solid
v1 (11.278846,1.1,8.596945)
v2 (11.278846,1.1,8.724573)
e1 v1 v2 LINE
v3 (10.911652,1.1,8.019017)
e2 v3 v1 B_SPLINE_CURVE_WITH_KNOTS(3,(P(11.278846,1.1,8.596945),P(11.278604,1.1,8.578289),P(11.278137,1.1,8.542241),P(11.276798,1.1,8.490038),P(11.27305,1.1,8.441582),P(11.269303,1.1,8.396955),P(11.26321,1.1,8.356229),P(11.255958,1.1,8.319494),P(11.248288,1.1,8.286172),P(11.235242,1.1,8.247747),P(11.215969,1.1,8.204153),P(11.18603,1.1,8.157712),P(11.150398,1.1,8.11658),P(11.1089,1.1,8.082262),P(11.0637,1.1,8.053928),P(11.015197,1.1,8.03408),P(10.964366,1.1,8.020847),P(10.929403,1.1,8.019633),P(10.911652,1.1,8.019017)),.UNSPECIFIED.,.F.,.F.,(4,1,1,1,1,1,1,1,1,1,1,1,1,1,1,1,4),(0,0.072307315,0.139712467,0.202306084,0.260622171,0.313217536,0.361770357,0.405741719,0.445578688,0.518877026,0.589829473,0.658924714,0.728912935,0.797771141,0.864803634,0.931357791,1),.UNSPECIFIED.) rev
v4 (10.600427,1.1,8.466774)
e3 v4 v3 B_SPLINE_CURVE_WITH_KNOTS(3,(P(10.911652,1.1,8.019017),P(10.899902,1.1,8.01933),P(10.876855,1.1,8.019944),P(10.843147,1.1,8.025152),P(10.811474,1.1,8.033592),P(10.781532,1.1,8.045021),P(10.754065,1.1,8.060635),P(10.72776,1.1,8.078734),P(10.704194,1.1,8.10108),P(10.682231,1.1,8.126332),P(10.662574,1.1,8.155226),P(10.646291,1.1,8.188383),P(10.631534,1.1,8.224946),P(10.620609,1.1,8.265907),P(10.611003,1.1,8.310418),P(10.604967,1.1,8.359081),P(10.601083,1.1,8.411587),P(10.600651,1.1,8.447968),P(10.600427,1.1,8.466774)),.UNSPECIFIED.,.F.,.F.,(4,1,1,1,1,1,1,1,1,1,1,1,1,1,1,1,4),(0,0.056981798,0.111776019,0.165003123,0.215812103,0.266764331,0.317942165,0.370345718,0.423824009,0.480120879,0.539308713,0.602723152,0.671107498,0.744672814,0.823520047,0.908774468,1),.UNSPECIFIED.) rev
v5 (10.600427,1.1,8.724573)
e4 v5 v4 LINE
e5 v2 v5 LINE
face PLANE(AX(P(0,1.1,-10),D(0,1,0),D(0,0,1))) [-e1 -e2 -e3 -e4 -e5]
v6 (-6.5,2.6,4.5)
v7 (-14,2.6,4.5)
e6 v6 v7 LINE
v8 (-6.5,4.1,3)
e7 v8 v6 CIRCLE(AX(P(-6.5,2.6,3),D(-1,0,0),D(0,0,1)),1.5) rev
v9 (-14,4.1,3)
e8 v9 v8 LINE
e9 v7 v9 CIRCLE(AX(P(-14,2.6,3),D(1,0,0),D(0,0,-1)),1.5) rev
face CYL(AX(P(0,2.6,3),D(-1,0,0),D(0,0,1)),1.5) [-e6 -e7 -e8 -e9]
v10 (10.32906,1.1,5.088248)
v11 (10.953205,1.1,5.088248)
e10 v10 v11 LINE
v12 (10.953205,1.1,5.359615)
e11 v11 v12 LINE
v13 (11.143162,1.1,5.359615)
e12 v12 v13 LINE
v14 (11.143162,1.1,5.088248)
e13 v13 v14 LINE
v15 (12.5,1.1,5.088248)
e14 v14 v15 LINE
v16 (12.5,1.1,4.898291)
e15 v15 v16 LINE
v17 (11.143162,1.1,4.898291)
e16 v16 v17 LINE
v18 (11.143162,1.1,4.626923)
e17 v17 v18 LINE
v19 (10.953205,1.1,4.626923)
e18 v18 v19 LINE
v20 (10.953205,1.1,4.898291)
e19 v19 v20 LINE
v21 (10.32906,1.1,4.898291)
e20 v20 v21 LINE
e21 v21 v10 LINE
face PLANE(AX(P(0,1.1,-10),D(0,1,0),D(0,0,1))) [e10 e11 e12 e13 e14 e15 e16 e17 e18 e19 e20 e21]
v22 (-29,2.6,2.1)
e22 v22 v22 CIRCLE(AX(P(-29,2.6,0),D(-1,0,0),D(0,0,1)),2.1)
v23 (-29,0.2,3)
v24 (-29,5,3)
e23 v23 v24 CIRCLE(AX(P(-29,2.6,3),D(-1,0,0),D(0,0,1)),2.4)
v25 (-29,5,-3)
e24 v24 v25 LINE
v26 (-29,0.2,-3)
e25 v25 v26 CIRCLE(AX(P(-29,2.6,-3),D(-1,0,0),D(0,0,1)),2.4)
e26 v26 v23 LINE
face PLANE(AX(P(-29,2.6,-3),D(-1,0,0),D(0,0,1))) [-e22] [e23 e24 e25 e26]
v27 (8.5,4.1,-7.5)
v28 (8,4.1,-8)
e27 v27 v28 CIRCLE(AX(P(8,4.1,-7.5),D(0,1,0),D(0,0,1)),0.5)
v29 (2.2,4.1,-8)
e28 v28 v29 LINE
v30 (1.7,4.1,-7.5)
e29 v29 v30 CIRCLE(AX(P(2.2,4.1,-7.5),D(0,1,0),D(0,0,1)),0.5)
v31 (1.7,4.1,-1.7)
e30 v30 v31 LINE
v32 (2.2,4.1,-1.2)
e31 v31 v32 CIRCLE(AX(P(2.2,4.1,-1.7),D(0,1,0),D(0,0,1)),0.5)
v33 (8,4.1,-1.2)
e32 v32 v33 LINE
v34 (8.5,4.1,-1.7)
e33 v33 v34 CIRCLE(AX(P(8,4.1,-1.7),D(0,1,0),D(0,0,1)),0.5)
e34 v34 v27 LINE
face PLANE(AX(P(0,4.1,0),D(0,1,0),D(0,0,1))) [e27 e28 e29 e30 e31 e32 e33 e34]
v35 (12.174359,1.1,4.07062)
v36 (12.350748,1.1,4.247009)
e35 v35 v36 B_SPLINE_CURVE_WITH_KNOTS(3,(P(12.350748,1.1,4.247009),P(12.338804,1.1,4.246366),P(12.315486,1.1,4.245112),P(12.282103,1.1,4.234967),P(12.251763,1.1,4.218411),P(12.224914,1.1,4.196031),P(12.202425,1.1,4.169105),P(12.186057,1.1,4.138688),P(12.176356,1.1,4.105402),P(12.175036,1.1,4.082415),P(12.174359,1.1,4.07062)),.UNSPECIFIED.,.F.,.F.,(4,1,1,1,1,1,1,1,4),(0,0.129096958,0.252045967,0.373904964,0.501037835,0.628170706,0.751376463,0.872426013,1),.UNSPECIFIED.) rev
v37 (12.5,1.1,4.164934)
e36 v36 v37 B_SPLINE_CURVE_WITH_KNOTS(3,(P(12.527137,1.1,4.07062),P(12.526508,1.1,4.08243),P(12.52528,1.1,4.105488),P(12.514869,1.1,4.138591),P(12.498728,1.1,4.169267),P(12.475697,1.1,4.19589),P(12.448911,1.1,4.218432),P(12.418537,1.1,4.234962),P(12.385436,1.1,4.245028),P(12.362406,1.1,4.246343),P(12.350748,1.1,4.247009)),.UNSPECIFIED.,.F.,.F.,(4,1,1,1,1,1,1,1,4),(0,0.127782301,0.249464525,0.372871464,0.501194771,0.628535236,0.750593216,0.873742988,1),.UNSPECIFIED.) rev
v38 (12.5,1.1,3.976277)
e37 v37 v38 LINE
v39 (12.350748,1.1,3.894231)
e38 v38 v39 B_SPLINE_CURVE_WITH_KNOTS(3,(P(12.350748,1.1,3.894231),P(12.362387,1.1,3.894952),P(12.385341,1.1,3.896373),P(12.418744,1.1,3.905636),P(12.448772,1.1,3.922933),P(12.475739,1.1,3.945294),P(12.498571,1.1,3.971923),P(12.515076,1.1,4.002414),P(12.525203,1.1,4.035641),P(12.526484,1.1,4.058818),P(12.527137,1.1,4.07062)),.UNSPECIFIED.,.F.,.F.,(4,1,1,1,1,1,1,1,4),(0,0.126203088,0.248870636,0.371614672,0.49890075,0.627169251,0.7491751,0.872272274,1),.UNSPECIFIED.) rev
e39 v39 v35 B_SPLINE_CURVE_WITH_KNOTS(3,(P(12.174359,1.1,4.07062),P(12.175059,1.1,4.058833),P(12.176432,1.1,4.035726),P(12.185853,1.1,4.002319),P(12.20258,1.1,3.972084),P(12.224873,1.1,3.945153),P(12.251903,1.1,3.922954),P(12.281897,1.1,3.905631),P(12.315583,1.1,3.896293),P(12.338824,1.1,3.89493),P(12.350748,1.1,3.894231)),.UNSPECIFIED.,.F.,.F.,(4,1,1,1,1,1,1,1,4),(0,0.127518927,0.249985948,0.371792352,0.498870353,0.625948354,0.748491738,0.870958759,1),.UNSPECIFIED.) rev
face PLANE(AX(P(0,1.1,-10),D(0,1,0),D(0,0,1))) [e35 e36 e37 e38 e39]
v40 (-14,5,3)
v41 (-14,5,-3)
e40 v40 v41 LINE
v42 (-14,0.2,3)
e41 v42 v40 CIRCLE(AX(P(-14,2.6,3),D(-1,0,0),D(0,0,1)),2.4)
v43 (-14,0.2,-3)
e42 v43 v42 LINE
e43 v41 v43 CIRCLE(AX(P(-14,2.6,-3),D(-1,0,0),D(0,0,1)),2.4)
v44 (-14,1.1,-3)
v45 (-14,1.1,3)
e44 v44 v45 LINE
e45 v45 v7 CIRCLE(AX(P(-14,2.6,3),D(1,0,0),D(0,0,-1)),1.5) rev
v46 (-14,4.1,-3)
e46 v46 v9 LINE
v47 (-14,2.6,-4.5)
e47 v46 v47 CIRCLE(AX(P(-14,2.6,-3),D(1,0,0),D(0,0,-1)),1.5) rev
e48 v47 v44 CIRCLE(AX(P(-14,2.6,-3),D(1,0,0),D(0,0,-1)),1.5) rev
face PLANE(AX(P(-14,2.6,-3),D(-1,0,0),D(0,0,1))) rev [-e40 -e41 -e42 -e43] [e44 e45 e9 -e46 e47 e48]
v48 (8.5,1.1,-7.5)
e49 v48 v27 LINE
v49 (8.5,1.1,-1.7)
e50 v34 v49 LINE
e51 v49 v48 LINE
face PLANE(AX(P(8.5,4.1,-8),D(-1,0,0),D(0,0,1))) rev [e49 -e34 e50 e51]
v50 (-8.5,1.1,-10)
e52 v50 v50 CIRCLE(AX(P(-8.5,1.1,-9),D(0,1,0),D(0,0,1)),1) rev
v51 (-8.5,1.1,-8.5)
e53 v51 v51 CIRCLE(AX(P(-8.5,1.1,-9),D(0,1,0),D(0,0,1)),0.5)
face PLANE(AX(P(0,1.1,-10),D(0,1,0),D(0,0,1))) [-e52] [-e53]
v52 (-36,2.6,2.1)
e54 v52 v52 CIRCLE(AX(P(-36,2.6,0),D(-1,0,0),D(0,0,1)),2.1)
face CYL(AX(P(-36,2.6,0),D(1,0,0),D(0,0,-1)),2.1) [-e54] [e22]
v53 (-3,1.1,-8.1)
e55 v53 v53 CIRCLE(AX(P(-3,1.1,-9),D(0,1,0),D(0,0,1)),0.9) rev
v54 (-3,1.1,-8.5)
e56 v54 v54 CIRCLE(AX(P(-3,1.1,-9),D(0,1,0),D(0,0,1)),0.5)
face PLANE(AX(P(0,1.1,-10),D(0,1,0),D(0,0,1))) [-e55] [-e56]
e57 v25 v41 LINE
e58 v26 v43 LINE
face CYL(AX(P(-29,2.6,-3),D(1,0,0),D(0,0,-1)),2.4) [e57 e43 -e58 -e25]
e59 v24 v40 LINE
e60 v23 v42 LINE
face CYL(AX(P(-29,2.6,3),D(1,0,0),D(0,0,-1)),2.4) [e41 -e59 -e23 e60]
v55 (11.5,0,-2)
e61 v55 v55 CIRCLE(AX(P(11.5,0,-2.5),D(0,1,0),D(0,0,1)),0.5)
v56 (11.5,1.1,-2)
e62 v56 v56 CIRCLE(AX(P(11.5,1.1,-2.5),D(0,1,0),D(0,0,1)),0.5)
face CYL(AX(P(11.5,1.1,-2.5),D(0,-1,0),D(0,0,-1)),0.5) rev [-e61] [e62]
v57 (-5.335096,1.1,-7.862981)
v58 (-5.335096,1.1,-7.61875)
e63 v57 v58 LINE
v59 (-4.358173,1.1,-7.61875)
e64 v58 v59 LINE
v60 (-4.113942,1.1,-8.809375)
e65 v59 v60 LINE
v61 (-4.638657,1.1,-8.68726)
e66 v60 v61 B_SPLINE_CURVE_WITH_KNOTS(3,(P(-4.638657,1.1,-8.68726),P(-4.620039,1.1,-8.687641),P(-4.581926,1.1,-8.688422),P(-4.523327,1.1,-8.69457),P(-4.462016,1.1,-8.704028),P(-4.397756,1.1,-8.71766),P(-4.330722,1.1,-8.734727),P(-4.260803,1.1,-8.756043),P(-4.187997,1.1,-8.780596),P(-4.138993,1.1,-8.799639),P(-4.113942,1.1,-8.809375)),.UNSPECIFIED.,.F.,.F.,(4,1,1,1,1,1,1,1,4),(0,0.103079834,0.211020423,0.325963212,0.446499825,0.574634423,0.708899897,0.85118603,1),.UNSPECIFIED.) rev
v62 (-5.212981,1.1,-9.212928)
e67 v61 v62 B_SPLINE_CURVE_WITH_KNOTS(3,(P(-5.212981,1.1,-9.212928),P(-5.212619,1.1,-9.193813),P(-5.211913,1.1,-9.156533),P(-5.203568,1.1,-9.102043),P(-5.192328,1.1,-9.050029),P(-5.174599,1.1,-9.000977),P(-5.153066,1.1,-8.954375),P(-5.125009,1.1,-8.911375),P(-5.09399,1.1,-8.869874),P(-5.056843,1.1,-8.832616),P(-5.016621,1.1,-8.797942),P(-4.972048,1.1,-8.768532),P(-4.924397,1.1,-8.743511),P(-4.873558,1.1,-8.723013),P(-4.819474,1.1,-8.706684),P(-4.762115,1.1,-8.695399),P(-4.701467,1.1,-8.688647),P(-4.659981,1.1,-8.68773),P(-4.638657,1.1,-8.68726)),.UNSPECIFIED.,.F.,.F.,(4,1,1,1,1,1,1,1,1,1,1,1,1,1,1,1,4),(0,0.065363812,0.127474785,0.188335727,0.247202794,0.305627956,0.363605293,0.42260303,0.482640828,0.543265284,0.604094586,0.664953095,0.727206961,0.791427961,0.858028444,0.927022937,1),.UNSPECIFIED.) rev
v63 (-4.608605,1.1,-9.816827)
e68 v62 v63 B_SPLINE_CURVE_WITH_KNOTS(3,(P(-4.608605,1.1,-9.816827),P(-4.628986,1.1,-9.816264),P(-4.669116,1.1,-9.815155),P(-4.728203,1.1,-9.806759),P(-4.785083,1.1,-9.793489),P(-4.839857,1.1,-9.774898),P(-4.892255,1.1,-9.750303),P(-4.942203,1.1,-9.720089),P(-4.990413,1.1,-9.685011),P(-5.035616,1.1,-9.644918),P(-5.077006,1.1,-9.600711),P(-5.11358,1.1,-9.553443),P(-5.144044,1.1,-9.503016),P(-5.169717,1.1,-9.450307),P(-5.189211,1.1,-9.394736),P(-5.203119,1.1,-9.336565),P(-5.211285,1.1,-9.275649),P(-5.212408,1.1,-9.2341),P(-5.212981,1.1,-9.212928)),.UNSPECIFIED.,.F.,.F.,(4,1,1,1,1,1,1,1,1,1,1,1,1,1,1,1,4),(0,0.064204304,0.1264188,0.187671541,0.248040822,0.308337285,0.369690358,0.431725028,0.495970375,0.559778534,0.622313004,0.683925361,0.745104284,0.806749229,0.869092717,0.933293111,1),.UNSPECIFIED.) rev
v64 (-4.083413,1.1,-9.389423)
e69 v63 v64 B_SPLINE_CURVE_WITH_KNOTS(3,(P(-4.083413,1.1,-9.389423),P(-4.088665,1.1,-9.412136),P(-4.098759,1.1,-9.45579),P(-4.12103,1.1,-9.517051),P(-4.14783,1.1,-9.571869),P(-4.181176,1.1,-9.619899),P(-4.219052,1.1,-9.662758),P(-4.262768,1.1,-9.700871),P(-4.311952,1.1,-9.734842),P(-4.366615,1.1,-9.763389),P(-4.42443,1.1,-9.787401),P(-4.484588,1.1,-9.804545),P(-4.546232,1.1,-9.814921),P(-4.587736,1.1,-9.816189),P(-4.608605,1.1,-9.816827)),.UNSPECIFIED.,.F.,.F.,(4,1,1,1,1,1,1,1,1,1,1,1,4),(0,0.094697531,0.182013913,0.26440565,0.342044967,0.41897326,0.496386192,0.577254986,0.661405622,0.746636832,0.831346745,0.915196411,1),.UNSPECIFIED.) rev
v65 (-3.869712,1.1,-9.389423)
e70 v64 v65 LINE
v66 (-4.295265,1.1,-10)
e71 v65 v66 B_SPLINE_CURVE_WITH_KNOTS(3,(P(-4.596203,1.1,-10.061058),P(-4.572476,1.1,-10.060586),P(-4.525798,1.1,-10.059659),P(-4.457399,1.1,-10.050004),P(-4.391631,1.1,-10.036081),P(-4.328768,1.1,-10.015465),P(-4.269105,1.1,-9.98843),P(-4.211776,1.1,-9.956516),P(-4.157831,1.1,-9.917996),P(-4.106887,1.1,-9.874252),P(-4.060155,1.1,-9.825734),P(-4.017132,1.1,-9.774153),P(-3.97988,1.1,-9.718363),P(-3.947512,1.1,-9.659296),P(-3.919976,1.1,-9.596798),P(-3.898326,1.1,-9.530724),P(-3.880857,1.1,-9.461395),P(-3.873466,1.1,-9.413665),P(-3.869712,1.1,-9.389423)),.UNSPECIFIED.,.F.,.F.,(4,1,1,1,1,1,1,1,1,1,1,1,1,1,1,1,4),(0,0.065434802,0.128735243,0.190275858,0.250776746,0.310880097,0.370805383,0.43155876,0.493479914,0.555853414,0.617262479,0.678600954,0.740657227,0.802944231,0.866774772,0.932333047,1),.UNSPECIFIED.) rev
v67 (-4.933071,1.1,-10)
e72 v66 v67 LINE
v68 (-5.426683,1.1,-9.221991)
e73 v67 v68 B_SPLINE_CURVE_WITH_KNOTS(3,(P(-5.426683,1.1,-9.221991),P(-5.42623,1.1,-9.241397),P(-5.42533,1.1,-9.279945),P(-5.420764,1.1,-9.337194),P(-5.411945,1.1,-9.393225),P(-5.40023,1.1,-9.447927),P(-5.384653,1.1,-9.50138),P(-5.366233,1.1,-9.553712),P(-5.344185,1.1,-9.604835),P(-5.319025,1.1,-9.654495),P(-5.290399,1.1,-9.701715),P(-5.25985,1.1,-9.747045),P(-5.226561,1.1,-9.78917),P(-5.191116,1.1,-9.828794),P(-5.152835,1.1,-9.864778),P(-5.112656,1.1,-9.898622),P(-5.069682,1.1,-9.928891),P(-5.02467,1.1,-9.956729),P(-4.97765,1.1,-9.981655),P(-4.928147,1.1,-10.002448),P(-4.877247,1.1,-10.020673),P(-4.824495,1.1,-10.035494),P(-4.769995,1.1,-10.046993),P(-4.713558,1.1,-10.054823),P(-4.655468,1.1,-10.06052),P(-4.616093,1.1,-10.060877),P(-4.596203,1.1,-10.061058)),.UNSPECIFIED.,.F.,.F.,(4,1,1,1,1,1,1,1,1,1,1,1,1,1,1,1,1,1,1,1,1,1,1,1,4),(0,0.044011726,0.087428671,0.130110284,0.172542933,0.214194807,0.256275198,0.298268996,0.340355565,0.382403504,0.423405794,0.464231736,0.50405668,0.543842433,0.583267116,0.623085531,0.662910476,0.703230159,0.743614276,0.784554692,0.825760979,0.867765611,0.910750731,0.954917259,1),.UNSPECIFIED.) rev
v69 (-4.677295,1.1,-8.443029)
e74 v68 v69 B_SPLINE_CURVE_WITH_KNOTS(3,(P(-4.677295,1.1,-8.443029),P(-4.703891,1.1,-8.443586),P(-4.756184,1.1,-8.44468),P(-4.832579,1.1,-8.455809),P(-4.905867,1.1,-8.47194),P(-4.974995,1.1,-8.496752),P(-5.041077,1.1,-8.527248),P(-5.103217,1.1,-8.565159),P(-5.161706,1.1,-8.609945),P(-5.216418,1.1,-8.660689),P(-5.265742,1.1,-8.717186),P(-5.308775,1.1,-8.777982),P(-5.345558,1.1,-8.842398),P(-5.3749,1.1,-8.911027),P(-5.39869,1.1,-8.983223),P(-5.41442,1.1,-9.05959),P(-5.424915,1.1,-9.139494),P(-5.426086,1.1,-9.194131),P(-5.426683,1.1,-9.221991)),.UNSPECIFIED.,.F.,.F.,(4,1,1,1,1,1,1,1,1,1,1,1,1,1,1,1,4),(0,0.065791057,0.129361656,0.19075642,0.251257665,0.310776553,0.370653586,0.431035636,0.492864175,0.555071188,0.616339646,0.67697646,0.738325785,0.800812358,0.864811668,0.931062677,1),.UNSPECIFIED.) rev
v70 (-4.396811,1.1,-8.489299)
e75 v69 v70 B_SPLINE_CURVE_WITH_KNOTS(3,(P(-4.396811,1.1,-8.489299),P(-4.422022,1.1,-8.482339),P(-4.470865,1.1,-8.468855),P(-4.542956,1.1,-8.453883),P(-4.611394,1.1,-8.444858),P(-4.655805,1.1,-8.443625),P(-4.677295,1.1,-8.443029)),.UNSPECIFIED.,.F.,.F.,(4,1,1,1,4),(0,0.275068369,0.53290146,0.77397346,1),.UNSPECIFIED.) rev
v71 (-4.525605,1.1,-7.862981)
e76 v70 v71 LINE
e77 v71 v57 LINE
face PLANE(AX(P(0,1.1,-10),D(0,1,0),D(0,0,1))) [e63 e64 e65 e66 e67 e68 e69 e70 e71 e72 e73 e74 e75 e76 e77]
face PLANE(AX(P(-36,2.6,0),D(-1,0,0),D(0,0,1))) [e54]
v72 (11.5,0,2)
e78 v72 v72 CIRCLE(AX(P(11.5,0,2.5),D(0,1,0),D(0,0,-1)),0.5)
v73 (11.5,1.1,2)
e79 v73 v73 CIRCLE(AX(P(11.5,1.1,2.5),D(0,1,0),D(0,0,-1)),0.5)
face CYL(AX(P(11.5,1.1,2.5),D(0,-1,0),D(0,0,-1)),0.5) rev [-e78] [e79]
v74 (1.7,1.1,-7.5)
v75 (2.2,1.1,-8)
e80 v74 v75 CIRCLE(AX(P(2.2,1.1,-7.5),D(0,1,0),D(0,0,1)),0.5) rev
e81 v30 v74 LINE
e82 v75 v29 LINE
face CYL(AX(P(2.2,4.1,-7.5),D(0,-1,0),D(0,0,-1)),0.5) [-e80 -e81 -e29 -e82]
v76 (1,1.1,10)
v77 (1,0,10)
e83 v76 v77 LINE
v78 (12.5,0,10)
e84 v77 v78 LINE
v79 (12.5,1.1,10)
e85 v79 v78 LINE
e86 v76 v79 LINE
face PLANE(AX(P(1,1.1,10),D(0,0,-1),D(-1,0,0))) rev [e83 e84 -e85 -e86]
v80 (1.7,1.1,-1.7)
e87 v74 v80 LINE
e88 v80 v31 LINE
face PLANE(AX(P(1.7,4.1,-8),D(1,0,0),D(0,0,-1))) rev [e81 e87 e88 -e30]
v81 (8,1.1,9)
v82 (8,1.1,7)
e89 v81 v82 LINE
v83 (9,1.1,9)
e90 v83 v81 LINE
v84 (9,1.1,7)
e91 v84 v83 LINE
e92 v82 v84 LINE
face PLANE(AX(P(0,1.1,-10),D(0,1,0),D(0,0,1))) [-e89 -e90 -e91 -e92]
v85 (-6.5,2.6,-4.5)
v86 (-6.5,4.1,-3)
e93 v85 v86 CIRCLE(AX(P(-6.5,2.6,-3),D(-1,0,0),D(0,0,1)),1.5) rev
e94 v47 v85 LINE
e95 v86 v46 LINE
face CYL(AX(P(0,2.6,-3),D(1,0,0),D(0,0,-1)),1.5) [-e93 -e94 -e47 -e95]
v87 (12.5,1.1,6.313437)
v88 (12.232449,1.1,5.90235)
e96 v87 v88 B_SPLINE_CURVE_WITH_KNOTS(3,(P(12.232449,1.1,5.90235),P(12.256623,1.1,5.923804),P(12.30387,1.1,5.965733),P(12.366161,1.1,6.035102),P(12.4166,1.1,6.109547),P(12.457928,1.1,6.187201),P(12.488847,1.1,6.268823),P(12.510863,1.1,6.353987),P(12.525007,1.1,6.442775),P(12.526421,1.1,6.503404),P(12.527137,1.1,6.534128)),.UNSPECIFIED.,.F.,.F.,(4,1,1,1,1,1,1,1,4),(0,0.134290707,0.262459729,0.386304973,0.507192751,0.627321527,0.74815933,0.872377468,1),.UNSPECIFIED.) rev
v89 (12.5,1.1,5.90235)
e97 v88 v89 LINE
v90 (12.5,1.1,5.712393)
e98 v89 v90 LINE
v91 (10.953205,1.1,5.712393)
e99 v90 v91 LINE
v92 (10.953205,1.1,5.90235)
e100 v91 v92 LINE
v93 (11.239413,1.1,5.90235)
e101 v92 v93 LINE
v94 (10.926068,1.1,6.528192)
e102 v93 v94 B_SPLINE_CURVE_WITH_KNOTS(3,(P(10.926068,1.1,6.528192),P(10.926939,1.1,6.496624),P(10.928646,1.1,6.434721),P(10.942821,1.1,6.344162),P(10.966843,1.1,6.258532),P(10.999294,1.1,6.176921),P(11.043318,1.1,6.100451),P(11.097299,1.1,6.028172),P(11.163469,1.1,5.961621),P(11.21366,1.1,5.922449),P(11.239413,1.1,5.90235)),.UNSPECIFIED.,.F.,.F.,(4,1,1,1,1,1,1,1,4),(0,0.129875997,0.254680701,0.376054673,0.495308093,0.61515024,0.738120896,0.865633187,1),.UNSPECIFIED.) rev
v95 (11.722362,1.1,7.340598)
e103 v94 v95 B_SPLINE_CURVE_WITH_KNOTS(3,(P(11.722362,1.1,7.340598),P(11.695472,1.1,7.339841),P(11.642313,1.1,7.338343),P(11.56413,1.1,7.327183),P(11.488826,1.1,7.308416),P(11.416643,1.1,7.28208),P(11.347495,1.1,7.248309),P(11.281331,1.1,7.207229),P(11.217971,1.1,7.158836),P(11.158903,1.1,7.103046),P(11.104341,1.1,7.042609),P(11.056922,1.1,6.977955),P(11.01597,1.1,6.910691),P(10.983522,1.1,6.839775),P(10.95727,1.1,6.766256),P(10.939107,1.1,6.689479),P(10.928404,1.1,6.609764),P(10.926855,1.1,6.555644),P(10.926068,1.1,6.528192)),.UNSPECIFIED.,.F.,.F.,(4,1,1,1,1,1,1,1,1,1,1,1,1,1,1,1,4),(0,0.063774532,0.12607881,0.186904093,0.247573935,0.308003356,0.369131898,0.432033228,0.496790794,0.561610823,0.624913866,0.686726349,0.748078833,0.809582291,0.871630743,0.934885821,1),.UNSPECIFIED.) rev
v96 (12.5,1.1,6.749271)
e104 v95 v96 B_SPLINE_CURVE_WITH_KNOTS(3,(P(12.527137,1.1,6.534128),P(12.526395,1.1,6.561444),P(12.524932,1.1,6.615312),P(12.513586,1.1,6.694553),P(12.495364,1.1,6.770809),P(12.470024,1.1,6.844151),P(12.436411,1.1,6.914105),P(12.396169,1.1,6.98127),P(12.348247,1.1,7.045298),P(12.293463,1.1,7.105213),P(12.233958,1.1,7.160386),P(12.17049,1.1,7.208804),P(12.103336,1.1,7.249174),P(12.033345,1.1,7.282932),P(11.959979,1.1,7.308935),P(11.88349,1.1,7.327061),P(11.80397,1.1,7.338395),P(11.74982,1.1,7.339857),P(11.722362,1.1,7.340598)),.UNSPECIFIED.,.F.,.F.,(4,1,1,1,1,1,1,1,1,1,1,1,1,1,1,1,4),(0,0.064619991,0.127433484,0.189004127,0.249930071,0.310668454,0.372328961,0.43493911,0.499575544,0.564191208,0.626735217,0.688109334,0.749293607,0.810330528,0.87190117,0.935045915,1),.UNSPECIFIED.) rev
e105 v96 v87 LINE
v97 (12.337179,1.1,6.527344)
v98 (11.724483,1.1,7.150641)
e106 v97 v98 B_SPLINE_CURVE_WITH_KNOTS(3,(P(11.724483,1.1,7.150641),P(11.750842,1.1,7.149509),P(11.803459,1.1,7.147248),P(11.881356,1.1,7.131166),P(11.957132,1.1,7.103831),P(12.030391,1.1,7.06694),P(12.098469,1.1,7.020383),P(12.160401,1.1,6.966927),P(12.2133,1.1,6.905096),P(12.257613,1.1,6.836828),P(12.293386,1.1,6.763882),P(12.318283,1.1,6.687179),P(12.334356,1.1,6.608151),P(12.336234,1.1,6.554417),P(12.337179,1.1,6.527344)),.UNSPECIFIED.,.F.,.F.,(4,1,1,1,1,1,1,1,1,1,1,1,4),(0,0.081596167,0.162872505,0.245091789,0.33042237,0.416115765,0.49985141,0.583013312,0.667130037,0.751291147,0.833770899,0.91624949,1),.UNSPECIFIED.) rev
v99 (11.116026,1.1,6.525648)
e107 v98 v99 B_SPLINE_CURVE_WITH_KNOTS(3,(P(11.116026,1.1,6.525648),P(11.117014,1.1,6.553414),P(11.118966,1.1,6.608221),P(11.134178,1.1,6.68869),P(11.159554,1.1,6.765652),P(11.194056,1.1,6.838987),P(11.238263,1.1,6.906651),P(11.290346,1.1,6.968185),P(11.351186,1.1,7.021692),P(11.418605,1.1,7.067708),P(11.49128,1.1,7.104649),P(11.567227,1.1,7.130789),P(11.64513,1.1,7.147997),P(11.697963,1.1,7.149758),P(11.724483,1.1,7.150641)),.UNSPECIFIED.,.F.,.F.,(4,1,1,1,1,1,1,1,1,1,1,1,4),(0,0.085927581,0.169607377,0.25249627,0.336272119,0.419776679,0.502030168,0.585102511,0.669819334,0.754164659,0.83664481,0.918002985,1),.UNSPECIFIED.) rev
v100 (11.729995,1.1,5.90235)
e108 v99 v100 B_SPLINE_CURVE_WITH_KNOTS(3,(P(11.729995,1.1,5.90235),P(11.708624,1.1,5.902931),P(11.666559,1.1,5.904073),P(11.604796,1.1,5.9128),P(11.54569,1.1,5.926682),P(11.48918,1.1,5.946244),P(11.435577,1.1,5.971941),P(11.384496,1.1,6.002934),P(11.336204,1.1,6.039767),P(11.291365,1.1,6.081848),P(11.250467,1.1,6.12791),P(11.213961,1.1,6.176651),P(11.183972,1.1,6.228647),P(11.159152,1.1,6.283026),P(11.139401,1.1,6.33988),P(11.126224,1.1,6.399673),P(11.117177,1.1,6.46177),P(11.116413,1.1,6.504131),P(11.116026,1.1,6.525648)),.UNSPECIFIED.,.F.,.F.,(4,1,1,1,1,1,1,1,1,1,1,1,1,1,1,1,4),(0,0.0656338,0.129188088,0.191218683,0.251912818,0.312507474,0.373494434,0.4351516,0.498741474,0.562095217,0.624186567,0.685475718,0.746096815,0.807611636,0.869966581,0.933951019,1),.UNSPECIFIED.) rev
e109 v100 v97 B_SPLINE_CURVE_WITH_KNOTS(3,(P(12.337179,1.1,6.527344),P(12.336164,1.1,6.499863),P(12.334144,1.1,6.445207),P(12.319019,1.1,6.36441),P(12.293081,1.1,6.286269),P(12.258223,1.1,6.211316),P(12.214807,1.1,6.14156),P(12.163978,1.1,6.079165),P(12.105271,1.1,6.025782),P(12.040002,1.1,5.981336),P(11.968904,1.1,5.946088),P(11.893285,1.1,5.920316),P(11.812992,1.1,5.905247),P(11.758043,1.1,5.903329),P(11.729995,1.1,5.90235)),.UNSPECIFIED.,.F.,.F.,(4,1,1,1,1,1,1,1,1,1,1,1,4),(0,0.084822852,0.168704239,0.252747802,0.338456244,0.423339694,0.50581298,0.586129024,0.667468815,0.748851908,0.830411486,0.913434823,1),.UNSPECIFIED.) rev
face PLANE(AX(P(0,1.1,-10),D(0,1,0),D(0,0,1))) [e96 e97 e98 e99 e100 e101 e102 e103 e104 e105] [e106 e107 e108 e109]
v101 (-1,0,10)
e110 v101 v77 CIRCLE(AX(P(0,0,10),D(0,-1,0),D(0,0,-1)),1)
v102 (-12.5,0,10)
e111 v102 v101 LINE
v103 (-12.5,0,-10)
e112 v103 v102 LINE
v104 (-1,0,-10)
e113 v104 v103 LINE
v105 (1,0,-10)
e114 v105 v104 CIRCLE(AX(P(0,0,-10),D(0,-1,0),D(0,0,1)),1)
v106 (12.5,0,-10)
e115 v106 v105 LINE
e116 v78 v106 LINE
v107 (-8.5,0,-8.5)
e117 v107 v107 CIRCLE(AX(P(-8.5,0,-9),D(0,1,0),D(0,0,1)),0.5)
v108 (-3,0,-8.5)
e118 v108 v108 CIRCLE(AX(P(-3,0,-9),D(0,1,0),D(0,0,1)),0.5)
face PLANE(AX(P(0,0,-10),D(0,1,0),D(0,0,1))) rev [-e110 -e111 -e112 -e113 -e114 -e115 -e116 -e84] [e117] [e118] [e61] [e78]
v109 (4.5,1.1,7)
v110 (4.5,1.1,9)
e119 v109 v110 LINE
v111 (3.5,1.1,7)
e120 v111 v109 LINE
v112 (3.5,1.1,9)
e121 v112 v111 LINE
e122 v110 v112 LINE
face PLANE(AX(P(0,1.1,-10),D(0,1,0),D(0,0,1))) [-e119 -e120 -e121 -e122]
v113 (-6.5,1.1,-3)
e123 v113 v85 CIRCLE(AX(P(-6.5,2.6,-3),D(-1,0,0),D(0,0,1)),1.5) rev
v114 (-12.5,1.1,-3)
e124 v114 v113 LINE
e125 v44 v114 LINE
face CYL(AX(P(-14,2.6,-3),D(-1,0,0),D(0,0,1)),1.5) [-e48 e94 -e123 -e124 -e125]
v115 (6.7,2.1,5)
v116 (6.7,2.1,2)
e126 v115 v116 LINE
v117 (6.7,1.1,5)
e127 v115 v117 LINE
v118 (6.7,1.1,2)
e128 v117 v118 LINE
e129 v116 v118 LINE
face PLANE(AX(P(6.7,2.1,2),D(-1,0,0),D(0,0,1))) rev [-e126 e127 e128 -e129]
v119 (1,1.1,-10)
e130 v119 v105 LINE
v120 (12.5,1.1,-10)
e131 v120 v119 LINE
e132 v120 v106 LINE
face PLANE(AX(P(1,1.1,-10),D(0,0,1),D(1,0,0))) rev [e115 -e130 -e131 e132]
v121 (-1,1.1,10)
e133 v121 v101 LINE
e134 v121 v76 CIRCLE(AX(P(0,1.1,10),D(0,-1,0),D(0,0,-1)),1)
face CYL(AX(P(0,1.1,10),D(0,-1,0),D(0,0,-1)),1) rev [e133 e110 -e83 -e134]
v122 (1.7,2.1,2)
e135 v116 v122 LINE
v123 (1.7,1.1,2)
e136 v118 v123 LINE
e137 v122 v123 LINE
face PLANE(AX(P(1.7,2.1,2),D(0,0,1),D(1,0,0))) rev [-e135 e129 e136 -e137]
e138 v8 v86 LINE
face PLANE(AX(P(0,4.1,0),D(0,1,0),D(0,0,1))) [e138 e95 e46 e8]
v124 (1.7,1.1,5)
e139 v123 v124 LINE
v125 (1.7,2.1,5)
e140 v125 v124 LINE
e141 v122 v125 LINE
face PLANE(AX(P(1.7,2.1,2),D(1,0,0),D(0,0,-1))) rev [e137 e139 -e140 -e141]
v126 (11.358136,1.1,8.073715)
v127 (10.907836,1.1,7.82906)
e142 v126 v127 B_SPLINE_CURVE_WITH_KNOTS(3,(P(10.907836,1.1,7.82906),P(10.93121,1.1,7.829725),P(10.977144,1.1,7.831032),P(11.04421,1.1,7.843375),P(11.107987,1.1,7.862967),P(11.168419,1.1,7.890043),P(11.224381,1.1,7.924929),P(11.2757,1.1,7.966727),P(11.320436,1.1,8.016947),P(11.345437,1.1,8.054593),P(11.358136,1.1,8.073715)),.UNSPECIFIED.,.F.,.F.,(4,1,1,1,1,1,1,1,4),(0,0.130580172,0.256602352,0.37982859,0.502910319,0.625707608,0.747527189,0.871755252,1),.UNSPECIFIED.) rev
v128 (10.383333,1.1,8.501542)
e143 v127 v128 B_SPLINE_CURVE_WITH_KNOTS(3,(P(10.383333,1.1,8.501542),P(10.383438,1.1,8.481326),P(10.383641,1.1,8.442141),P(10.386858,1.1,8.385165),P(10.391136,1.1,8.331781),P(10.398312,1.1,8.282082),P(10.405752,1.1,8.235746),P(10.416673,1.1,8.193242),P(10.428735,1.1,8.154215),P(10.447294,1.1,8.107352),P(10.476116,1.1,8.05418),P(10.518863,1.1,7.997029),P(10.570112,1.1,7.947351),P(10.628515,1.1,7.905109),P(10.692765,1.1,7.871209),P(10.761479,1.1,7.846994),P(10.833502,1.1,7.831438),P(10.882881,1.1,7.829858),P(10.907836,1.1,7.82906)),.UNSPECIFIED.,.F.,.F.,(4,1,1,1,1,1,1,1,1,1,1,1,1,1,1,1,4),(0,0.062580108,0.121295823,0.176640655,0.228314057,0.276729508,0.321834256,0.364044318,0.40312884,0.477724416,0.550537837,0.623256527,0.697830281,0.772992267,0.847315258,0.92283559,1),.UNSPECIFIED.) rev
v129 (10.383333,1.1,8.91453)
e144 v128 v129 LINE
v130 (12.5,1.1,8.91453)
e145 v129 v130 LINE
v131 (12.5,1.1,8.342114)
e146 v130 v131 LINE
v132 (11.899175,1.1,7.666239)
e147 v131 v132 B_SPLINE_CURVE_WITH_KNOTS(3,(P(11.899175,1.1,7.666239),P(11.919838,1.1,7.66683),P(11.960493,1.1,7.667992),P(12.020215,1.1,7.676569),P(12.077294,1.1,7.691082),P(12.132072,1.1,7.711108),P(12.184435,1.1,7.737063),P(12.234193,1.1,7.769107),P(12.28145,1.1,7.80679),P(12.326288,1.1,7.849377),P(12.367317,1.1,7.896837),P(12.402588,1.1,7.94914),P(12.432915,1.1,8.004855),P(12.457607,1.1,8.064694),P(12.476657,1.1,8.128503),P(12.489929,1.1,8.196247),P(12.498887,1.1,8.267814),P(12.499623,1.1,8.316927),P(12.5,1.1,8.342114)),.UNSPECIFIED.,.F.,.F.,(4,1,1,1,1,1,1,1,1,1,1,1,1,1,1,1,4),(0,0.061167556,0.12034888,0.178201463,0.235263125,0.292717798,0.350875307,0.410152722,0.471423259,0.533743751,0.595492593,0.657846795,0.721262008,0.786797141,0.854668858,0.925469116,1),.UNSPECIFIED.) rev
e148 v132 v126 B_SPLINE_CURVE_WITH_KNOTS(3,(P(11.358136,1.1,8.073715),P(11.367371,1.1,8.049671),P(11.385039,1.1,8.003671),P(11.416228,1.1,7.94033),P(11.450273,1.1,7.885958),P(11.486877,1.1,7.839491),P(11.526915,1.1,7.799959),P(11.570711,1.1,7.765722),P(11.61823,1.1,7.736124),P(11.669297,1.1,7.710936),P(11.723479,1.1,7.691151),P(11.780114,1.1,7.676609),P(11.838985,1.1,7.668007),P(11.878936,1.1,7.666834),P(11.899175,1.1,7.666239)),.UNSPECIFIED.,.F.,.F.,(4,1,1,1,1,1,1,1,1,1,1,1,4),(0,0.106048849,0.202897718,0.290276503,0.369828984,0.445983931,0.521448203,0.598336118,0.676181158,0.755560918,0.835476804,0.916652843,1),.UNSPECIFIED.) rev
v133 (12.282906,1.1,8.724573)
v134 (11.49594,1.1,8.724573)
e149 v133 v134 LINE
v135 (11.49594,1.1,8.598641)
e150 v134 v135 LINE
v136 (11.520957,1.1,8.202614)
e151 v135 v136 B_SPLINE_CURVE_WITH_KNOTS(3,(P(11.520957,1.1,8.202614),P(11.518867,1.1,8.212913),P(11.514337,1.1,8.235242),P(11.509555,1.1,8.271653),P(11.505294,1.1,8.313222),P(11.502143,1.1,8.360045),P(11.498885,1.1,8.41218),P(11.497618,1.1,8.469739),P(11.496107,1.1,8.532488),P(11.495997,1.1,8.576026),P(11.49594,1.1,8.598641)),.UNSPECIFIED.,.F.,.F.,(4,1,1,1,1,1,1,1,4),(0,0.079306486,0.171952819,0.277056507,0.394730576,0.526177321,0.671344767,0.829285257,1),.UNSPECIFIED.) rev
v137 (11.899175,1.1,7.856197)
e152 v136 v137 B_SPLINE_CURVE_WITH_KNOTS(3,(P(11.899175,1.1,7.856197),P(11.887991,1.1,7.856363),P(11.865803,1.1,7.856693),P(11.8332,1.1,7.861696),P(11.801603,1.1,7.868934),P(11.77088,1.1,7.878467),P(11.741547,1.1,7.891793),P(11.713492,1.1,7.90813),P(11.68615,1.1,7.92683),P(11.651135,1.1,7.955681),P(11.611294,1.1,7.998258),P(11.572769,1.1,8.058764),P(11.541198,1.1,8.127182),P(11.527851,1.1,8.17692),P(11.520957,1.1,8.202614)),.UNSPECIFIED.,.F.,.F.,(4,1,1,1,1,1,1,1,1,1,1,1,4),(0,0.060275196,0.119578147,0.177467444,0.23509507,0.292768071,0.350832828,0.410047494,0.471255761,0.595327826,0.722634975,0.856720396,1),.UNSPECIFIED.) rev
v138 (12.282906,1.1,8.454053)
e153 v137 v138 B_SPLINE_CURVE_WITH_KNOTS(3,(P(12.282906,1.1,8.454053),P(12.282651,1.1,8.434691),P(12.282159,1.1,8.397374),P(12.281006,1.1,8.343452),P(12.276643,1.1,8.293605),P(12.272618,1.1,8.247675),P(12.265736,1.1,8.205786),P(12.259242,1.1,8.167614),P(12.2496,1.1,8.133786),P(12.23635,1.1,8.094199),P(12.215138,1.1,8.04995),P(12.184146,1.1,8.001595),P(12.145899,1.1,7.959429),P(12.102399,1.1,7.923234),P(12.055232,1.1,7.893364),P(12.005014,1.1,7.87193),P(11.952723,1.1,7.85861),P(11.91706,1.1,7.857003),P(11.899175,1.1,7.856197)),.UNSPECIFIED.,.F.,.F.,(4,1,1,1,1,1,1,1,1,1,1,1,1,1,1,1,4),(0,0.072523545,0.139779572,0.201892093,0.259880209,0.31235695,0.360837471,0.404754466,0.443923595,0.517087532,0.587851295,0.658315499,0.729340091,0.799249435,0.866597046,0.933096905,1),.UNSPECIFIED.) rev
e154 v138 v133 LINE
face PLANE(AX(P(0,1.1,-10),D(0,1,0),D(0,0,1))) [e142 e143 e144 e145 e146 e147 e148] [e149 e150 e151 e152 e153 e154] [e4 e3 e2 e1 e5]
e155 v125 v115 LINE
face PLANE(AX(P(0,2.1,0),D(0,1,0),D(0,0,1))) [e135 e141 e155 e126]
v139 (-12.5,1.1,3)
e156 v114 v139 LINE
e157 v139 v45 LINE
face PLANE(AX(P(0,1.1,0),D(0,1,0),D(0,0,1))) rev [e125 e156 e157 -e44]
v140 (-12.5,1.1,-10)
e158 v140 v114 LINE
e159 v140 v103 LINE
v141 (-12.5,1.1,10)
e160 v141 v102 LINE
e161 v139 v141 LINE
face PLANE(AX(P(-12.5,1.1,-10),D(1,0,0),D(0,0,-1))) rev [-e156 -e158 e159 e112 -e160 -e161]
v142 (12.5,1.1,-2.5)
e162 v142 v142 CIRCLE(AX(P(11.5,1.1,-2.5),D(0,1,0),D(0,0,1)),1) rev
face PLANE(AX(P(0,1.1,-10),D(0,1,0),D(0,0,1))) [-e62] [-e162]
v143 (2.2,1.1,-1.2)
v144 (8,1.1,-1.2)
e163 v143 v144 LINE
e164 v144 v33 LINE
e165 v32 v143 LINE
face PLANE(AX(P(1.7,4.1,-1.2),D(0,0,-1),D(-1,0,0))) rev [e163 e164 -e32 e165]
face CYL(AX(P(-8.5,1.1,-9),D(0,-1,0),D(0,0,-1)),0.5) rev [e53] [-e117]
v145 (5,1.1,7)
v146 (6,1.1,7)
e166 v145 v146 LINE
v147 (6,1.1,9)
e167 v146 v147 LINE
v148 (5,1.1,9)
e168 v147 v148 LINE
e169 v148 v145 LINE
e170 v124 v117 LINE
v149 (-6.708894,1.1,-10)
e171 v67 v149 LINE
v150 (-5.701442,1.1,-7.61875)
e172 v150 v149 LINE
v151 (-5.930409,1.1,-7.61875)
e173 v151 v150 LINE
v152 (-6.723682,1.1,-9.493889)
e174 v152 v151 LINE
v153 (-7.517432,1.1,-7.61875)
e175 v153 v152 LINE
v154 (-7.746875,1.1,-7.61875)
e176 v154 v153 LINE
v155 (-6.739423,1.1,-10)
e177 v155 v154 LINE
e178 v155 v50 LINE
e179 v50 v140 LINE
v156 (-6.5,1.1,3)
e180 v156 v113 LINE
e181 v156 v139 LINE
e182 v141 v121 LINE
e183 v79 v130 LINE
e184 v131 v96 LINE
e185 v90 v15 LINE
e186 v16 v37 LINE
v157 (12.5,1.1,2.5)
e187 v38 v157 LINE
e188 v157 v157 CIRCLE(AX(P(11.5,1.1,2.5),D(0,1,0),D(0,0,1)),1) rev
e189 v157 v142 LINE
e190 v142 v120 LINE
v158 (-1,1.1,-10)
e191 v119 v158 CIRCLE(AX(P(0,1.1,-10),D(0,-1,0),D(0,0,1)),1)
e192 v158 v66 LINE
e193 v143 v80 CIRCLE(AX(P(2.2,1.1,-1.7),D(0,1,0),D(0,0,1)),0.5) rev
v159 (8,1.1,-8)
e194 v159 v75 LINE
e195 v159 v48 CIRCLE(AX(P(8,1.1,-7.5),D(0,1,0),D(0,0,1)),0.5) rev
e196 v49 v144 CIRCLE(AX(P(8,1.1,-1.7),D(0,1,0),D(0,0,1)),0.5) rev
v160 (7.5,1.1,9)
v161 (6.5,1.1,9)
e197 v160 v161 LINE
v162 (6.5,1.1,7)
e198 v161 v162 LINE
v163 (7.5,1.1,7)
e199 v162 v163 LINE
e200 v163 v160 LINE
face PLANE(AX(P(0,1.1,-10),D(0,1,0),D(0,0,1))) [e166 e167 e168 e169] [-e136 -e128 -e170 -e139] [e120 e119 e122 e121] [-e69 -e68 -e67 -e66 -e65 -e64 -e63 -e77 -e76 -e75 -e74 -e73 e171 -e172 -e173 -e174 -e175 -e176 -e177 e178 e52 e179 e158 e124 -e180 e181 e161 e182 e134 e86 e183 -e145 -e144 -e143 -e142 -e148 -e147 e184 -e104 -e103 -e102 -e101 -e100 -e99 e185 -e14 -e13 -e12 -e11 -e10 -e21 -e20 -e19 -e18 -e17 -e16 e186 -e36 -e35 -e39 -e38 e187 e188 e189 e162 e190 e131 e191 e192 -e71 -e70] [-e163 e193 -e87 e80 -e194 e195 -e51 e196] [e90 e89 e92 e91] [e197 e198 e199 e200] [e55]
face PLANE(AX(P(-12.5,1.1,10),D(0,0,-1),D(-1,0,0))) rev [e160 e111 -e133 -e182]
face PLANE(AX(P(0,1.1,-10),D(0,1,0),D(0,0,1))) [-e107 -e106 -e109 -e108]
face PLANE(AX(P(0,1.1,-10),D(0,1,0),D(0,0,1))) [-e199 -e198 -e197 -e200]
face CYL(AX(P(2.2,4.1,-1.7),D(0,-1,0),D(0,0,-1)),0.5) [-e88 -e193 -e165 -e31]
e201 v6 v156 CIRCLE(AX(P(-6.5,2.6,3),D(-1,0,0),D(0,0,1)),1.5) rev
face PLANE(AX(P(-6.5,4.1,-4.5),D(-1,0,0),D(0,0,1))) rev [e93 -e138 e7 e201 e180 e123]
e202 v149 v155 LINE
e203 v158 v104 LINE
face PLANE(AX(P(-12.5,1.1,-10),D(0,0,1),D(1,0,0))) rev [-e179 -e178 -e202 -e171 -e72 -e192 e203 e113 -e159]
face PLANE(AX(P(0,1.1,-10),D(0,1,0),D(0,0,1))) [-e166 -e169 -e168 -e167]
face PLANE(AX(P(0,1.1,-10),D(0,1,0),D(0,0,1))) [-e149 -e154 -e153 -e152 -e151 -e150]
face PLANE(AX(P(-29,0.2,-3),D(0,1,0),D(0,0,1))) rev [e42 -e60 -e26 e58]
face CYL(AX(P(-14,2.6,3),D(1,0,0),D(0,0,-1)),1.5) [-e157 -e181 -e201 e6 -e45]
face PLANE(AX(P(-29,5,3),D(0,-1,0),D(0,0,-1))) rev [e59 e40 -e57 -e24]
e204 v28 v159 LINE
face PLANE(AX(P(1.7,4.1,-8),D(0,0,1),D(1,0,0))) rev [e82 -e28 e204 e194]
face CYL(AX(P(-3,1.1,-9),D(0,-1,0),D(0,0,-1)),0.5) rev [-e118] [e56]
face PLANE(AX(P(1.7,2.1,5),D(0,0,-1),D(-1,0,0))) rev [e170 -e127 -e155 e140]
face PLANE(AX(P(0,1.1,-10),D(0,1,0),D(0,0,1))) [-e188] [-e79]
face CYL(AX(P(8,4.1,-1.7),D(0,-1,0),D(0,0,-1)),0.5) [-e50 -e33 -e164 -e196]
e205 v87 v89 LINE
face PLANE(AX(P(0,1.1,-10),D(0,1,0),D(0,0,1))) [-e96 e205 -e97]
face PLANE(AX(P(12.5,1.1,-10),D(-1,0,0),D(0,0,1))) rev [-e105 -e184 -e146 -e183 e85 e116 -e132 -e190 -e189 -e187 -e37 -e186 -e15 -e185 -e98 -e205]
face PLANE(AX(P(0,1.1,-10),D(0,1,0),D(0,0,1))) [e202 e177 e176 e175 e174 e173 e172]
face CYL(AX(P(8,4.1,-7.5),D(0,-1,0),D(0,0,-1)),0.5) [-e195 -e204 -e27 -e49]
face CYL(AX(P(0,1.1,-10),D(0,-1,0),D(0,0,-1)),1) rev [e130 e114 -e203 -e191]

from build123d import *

# Parameters (mm, degrees)
CROQUIS1_R              = 0.5
SALIENTE_EXTRUIR1_DEPTH = 1.1
CROQUIS2_W              = 7.5
CROQUIS2_H              = 9
SALIENTE_EXTRUIR2_DEPTH = 3
REDONDEO1_R             = 1.5
CROQUIS3_W              = 6.8
CROQUIS3_H              = 6.8
SALIENTE_EXTRUIR3_DEPTH = 3
REDONDEO2_R             = 0.5
CROQUIS4_W              = 5
CROQUIS4_H              = 3
SALIENTE_EXTRUIR4_DEPTH = 1
SALIENTE_EXTRUIR5_DEPTH = 15
CROQUIS7_R              = 2.1
SALIENTE_EXTRUIR6_DEPTH = 7


with BuildPart() as part:
    # Croquis1 → Saliente-Extruir1 (new body)
    with BuildSketch(Plane(origin=(0, 0, 0), x_dir=(1, 0, 0), z_dir=(0, 1, 0))):
        with BuildLine():
            Line((-12.5, 10), (-1, 10))
            ThreePointArc((-1, 10), (0, 9), (1, 10))
            Line((1, 10), (12.5, 10))
            Line((12.5, 10), (12.5, -10))
            Line((12.5, -10), (1, -10))
            ThreePointArc((1, -10), (0, -9), (-1, -10))
            Line((-1, -10), (-12.5, -10))
            Line((-12.5, -10), (-12.5, 10))
        make_face()
        with Locations(Location((11.5, 2.5, 0), (0, 0, 270))):
            Circle(CROQUIS1_R, mode=Mode.SUBTRACT)
        with Locations(Location((11.5, -2.5, 0), (0, 0, 90))):
            Circle(CROQUIS1_R, mode=Mode.SUBTRACT)
        with Locations(Location((-8.5, 9, 0), (0, 0, 270))):
            Circle(CROQUIS1_R, mode=Mode.SUBTRACT)
        with Locations(Location((-3, 9, 0), (0, 0, 270))):
            Circle(CROQUIS1_R, mode=Mode.SUBTRACT)
    extrude(amount=SALIENTE_EXTRUIR1_DEPTH)


with BuildPart() as body_2:
    # Croquis2 → Saliente-Extruir2 (new body)
    with BuildSketch(Plane(origin=(0, 1.1, 0), x_dir=(1, 0, 0), z_dir=(0, 1, 0))):
        with Locations((-10.25, 0)):
            Rectangle(CROQUIS2_W, CROQUIS2_H)
    extrude(amount=SALIENTE_EXTRUIR2_DEPTH)

    # Redondeo1
    redondeo1_edges = [body_2.edges().sort_by_distance(p)[0] for p in [
        (-10.25, 1.1, -4.5),
        (-10.25, 4.1, -4.5),
        (-10.25, 1.1, 4.5),
        (-10.25, 4.1, 4.5),
    ]]
    fillet(redondeo1_edges, radius=REDONDEO1_R - 0.0001)  # a hair under: the kernel refuses the full size

    # Combinar1: union part
    add(part.part)

    # Croquis3 → Saliente-Extruir3 (add)
    with BuildSketch(Plane(origin=(0, 1.1, 0), x_dir=(1, 0, 0), z_dir=(0, 1, 0))):
        with Locations((5.1, 4.6)):
            Rectangle(CROQUIS3_W, CROQUIS3_H)
    extrude(amount=SALIENTE_EXTRUIR3_DEPTH)

    # Redondeo2
    redondeo2_edges = [body_2.edges().sort_by_distance(p)[0] for p in [
        (8.5, 2.6, -1.2),
        (8.5, 2.6, -8),
        (1.7, 2.6, -8),
        (1.7, 2.6, -1.2),
    ]]
    fillet(redondeo2_edges, radius=REDONDEO2_R)

    # Croquis4 → Saliente-Extruir4 (add)
    with BuildSketch(Plane(origin=(0, 1.1, 0), x_dir=(1, 0, 0), z_dir=(0, 1, 0))):
        with Locations((4.2, -3.5)):
            Rectangle(CROQUIS4_W, CROQUIS4_H)
    extrude(amount=SALIENTE_EXTRUIR4_DEPTH)

    # Croquis6 → Saliente-Extruir5 (add)
    with BuildSketch(Plane.ZY.offset(14)):
        with BuildLine():
            Line((-3, 0.2), (3, 0.2))
            ThreePointArc((3, 0.2), (4.697056275, 0.902943725), (5.4, 2.6))
            ThreePointArc((5.4, 2.6), (4.697056275, 4.297056275), (3, 5))
            Line((3, 5), (-3, 5))
            ThreePointArc((-3, 5), (-4.697056275, 4.297056275), (-5.4, 2.6))
            ThreePointArc((-5.4, 2.6), (-4.697056275, 0.902943725), (-3, 0.2))
        make_face()
    extrude(amount=SALIENTE_EXTRUIR5_DEPTH)

    # Croquis7 → Saliente-Extruir6 (add)
    with BuildSketch(Plane.ZY.offset(29)):
        with Locations((0, 2.6)):
            Circle(CROQUIS7_R)
    extrude(amount=SALIENTE_EXTRUIR6_DEPTH)


solid = body_2.part
